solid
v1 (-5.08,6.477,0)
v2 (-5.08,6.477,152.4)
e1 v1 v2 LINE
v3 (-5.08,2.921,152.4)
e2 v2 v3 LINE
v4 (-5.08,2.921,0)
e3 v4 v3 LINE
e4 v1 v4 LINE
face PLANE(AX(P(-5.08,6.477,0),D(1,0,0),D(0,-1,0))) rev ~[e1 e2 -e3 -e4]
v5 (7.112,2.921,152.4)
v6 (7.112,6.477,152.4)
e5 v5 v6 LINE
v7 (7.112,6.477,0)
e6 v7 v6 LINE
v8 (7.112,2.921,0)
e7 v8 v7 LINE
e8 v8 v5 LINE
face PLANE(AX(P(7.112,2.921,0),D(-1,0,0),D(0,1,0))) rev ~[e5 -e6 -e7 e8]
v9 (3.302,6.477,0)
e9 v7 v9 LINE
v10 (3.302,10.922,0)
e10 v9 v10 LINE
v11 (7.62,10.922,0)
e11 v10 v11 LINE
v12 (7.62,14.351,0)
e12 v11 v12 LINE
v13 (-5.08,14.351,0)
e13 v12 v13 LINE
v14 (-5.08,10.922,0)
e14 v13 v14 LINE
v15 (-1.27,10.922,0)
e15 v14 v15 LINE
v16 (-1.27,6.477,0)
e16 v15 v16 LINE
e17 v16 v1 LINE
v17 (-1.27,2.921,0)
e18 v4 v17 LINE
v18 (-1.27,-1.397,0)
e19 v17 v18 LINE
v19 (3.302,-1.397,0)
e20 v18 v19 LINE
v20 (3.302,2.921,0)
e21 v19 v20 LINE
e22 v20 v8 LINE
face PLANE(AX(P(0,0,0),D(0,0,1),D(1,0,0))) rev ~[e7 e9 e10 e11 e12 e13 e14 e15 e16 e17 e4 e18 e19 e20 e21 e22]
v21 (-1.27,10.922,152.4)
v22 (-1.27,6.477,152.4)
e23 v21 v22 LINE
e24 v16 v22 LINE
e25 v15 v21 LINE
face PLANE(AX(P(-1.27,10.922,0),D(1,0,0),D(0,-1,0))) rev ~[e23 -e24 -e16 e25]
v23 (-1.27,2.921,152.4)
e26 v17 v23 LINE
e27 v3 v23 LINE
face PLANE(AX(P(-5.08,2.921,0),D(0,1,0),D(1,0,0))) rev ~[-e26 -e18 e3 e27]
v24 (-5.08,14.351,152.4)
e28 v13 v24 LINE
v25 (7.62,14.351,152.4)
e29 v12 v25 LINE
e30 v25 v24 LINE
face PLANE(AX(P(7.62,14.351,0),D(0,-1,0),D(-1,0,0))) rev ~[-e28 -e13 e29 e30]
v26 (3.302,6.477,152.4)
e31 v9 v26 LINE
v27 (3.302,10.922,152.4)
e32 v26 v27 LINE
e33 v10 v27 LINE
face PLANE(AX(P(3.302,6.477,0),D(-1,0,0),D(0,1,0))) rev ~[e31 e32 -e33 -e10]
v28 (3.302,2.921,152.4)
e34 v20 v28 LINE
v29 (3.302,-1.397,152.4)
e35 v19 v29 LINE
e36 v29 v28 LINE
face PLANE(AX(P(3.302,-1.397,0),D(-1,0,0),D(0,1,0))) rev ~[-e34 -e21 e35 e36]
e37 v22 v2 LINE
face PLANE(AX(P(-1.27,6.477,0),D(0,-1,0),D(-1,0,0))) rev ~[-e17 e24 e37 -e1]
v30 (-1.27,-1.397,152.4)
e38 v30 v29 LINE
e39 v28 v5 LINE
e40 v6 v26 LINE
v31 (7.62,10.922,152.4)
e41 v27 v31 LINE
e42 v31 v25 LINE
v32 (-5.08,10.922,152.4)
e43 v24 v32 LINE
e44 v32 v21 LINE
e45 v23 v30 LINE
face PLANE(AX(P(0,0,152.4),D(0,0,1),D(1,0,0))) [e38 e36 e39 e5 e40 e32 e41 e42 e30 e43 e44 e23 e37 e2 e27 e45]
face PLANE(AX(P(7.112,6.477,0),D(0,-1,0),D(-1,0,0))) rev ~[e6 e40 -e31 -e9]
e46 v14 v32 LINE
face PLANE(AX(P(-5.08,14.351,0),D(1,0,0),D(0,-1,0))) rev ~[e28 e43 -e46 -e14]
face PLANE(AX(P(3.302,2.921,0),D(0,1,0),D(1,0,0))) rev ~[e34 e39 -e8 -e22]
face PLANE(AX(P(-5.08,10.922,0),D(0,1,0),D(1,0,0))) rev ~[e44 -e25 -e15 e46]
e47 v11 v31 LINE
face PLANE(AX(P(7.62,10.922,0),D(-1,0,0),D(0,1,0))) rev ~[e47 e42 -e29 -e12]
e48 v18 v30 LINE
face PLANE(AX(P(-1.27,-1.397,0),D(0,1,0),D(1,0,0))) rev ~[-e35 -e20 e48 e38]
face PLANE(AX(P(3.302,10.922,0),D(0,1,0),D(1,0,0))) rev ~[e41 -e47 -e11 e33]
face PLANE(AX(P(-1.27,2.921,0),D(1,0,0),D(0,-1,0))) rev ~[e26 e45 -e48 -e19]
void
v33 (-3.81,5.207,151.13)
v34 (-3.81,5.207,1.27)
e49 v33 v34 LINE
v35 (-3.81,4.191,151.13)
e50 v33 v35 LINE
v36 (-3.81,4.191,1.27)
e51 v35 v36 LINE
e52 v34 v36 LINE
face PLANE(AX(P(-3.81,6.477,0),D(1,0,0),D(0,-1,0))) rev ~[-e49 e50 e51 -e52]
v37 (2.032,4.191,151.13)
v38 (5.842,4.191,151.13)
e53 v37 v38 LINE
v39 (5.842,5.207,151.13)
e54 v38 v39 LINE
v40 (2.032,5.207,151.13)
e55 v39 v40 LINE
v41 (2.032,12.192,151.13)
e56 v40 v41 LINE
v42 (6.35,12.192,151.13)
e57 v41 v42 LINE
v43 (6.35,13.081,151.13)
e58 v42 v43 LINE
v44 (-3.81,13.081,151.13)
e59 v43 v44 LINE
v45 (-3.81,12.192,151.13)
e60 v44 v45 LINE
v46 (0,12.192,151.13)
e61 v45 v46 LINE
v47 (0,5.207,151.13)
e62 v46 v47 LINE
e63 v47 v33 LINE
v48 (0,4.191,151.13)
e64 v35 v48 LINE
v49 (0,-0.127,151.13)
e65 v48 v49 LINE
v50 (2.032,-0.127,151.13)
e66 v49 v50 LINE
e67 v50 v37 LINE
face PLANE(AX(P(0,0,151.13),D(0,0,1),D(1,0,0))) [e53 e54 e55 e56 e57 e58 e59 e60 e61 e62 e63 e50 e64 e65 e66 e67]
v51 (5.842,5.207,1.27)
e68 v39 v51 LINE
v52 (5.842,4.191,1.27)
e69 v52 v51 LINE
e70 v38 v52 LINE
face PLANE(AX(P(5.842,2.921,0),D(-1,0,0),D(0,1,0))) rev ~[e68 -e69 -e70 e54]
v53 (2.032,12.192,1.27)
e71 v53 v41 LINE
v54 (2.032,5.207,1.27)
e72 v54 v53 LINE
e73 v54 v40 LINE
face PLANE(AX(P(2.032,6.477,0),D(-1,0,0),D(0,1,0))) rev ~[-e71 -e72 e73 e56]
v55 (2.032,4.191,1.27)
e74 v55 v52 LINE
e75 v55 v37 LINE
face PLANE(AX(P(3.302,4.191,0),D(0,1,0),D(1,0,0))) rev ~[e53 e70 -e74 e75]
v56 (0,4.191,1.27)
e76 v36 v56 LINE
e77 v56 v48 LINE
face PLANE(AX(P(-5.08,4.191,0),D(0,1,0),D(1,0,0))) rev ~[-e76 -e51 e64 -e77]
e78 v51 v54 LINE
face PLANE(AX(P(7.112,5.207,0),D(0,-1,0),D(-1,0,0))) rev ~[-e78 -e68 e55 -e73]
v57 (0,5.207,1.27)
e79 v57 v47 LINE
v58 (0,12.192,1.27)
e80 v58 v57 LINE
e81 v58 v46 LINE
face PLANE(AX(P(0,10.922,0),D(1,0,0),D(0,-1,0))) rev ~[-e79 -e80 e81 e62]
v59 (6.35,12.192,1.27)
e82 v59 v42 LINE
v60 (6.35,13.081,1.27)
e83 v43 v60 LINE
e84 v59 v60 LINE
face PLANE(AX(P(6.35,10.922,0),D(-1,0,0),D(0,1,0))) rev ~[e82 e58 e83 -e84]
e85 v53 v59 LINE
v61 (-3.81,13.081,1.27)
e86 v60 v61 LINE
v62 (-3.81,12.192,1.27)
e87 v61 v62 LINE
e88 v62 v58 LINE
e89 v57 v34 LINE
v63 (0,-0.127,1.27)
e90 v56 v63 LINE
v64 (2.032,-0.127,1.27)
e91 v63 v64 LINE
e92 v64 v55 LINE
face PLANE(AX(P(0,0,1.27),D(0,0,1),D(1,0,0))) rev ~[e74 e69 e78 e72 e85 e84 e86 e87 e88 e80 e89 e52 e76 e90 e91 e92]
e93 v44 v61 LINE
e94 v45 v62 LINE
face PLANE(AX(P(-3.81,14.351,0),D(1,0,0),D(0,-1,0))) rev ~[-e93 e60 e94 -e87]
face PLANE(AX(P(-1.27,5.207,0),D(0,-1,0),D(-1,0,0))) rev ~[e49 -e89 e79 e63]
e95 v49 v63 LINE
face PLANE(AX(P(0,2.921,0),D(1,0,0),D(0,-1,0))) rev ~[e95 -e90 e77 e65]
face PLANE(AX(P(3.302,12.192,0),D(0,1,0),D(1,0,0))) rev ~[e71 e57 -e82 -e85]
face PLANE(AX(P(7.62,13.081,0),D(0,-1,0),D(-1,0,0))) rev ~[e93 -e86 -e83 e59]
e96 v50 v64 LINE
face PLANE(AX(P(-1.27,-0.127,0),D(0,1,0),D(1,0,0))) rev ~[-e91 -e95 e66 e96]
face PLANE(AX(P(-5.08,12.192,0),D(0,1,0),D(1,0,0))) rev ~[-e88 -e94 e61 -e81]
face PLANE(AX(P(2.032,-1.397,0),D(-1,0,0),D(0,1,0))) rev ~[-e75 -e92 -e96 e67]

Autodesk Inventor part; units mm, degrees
ref_plane "YZ Plane" through (0, 0, 0) normal (1, 0, 0) x (0, 1, 0)
ref_plane "XZ Plane" through (0, 0, 0) normal (0, 1, 0) x (-1, 0, 0)
ref_plane "XY Plane" through (0, 0, 0) normal (0, 0, 1) x (1, 0, 0)
sketch "Sketch1" plane through (0, 0, 0) normal (0, 0, 1) x (1, 0, 0)
  point P0 (0, 0)
sketch "Sketch2" plane through (0, 0, 0) normal (0, 0, 1) x (1, 0, 0)
  point P0 (0, 0)
sketch "Sketch3" plane through (0, 0, 0) normal (0, 0, 1) x (1, 0, 0)
  line L0 (7.62, 10.922) -> (7.62, 14.351)
  line L1 (7.62, 14.351) -> (-5.08, 14.351)
  line L2 (-5.08, 14.351) -> (-5.08, 10.922)
  line L3 (-5.08, 10.922) -> (-1.27, 10.922)
  line L4 (-1.27, 10.922) -> (-1.27, 6.477)
  line L5 (-1.27, 6.477) -> (-5.08, 6.477)
  line L6 (-5.08, 6.477) -> (-5.08, 2.921)
  line L7 (-5.08, 2.921) -> (-1.27, 2.921)
  line L8 (-1.27, 2.921) -> (-1.27, -1.397)
  line L9 (-1.27, -1.397) -> (3.302, -1.397)
  line L10 (3.302, -1.397) -> (3.302, 2.921)
  line L11 (3.302, 2.921) -> (7.112, 2.921)
  line L12 (7.112, 2.921) -> (7.112, 6.477)
  line L13 (7.112, 6.477) -> (3.302, 6.477)
  line L14 (3.302, 6.477) -> (3.302, 10.922)
  line L15 (3.302, 10.922) -> (7.62, 10.922)
  point P0 (0, 0)
  dimension "d6" = 3.429
  dimension "d7" = 12.7
  dimension "d9" = 3.429
  dimension "d12" = 3.81
  dimension "d13" = 4.445
  dimension "d14" = 3.556
  dimension "d15" = 4.572
  dimension "d16" = 4.318
  dimension "d17" = 3.556
  dimension "d21" = 4.318
extrude "Extrusion1" add sketch "Sketch3" along normal blind 152.4
shell "Shell1" thickness 1.27 removed faces 0
properties part number "RIPnewslide2"
